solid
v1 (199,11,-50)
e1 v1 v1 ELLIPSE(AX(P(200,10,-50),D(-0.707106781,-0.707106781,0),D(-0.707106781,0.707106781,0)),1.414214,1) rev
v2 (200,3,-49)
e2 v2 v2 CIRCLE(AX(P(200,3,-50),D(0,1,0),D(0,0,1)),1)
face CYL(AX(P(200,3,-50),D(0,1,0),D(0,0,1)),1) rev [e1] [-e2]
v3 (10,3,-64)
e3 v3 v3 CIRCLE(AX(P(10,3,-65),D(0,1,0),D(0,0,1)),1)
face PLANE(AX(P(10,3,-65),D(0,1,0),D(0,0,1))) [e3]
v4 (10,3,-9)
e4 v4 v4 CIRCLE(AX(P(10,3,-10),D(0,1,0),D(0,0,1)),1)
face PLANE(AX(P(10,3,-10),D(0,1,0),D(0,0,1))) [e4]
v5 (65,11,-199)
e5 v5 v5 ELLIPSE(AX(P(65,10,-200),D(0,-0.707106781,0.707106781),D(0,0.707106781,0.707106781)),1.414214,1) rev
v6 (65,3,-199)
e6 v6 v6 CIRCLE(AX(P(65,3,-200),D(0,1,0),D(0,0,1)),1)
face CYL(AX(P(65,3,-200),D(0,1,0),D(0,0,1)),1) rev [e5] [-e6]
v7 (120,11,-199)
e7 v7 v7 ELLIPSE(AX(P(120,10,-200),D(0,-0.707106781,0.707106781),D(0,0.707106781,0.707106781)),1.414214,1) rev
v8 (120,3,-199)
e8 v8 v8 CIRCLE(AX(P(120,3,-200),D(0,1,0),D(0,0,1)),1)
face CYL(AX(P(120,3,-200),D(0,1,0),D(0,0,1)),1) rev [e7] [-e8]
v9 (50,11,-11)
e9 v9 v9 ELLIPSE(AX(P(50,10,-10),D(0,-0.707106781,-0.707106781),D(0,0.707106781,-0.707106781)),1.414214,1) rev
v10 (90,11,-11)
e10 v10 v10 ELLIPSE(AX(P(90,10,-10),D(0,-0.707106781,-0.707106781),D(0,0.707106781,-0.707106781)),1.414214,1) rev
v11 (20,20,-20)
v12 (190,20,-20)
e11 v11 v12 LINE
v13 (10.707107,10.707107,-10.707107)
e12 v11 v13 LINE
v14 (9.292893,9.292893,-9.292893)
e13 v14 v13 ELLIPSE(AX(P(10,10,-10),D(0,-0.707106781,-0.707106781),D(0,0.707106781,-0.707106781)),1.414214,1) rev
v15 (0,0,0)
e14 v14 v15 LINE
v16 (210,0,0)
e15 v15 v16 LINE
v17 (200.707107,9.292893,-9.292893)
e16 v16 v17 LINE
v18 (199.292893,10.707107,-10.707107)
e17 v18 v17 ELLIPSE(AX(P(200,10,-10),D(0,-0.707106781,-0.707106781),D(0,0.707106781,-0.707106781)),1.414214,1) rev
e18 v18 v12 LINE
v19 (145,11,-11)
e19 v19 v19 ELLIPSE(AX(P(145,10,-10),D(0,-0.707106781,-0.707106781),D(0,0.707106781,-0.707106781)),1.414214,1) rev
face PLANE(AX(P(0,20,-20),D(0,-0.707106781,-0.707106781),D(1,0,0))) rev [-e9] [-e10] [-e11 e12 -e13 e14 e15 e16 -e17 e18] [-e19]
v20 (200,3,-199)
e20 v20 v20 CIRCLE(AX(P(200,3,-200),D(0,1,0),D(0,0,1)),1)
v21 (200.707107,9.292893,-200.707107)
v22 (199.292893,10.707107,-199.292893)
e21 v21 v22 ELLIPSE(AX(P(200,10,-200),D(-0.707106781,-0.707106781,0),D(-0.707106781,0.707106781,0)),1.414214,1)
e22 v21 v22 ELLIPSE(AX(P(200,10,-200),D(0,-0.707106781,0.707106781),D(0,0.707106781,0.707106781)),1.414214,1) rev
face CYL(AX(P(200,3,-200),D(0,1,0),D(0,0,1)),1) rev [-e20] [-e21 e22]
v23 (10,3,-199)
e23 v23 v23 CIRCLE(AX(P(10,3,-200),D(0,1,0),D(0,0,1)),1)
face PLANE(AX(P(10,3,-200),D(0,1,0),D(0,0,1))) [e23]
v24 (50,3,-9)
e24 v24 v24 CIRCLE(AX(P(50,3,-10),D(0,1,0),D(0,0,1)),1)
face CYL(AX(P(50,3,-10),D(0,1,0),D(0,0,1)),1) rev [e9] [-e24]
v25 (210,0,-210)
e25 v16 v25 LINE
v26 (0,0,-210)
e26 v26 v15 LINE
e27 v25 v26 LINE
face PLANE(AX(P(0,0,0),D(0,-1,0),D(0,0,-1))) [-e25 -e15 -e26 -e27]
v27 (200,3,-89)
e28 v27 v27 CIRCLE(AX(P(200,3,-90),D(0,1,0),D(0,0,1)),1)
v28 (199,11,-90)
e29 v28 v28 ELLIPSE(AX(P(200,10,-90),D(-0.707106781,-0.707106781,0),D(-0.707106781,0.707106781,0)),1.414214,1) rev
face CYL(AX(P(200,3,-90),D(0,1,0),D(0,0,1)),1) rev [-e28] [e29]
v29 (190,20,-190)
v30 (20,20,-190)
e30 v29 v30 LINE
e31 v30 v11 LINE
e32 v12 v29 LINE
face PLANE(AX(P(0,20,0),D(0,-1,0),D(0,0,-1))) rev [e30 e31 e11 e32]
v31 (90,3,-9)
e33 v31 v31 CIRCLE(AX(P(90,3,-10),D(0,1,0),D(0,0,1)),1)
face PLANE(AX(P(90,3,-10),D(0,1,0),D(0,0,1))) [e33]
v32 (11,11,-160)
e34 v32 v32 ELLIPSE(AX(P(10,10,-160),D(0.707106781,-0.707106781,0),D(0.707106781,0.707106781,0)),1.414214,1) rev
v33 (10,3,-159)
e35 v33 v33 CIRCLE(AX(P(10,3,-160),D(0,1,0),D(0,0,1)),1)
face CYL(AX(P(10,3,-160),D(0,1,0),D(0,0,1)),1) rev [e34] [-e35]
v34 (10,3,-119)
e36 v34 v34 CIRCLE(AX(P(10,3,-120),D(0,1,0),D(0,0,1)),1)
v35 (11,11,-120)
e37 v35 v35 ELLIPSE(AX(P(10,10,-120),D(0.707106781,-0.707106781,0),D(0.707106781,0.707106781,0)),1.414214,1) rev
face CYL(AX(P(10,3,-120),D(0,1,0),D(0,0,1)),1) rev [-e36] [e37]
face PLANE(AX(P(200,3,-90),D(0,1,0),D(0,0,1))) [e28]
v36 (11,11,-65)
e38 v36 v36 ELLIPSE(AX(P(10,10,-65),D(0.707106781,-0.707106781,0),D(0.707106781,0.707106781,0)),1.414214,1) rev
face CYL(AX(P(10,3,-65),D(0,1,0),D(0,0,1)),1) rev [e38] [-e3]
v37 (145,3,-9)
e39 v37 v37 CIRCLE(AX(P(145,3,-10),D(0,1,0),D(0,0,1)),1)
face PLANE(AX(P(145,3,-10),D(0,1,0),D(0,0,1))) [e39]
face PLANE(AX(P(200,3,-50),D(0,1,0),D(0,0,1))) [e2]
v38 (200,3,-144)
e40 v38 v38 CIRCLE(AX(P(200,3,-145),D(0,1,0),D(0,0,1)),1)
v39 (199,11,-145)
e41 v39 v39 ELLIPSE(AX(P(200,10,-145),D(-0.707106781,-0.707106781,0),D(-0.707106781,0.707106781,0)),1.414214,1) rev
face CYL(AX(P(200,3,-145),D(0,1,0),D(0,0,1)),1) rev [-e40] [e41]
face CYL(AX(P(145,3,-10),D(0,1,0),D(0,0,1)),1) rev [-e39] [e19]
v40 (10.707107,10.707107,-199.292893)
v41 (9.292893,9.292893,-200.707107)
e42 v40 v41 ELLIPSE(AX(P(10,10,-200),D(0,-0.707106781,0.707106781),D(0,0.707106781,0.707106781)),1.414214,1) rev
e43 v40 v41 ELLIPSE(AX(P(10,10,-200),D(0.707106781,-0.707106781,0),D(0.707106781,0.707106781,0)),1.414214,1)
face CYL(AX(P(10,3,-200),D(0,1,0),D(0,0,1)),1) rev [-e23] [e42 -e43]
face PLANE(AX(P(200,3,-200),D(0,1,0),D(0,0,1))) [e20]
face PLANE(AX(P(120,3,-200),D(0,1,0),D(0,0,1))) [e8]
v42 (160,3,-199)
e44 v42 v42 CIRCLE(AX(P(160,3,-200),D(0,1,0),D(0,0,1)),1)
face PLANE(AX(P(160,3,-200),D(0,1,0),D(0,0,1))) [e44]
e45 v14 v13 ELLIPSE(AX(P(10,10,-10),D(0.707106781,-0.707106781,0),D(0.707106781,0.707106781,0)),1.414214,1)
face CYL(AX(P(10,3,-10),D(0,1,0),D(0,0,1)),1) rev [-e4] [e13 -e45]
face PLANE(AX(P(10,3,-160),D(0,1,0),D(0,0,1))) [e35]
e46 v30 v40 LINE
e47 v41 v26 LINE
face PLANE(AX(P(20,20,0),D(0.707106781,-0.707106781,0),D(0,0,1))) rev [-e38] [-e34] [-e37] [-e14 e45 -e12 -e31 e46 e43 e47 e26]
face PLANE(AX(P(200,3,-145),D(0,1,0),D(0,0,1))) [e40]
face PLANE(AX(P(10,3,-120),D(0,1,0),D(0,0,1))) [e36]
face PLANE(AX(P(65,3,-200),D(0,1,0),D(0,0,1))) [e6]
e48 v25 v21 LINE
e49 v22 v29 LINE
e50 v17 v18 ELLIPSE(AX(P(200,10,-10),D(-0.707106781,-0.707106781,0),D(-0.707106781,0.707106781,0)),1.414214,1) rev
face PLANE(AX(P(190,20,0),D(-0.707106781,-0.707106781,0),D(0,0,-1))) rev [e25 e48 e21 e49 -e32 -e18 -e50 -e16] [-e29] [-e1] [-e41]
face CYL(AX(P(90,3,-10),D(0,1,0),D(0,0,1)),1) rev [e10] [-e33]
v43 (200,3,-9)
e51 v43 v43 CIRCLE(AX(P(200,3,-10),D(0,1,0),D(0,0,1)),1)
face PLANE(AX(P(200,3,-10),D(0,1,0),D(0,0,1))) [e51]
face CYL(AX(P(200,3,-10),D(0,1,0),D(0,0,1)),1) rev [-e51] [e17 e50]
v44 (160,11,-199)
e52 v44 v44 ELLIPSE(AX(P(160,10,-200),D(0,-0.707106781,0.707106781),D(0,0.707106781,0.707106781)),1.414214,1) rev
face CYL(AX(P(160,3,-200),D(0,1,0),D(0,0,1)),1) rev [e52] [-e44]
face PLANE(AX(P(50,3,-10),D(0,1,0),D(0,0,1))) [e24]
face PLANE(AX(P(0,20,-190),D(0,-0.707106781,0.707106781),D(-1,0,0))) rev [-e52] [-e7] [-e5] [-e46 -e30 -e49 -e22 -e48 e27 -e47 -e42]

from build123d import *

# Parameters (mm, degrees)
CENTERSKETCH1_W            = 210
CENTERSKETCH1_H            = 210
CENTERBOSS_EXTRUDE1_DEPTH  = 20
TABHOLESSKETCH1_R          = 1
TABHOLESCUT_EXTRUDE1_DEPTH = 17
CHAMFER1_SIZE              = 20


with BuildPart() as part:
    # CenterSketch1 → CenterBoss-Extrude1 (new body)
    with BuildSketch(Plane(origin=(0, 0, 0), x_dir=(1, 0, 0), z_dir=(0, 1, 0))):
        with Locations((105, 105)):
            Rectangle(CENTERSKETCH1_W, CENTERSKETCH1_H)
    extrude(amount=CENTERBOSS_EXTRUDE1_DEPTH)

    # TabHolesSketch1 → TabHolesCut-Extrude1 (cut)
    with BuildSketch(Plane(origin=(0, 20, 0), x_dir=(1, 0, 0), z_dir=(0, 1, 0))):
        with Locations(Location((10, 10, 0), (0, 0, 270))):
            Circle(TABHOLESSKETCH1_R)
        with Locations(Location((200, 10, 0), (0, 0, 270))):
            Circle(TABHOLESSKETCH1_R)
        with Locations(Location((200, 200, 0), (0, 0, 270))):
            Circle(TABHOLESSKETCH1_R)
        with Locations(Location((10, 200, 0), (0, 0, 270))):
            Circle(TABHOLESSKETCH1_R)
        with Locations(Location((65, 200, 0), (0, 0, 270))):
            Circle(TABHOLESSKETCH1_R)
        with Locations(Location((120, 200, 0), (0, 0, 270))):
            Circle(TABHOLESSKETCH1_R)
        with Locations(Location((160, 200, 0), (0, 0, 270))):
            Circle(TABHOLESSKETCH1_R)
        with Locations(Location((10, 160, 0), (0, 0, 270))):
            Circle(TABHOLESSKETCH1_R)
        with Locations(Location((10, 65, 0), (0, 0, 270))):
            Circle(TABHOLESSKETCH1_R)
        with Locations(Location((10, 120, 0), (0, 0, 270))):
            Circle(TABHOLESSKETCH1_R)
        with Locations(Location((50, 10, 0), (0, 0, 270))):
            Circle(TABHOLESSKETCH1_R)
        with Locations(Location((90, 10, 0), (0, 0, 270))):
            Circle(TABHOLESSKETCH1_R)
        with Locations(Location((145, 10, 0), (0, 0, 270))):
            Circle(TABHOLESSKETCH1_R)
        with Locations(Location((200, 145, 0), (0, 0, 270))):
            Circle(TABHOLESSKETCH1_R)
        with Locations(Location((200, 90, 0), (0, 0, 270))):
            Circle(TABHOLESSKETCH1_R)
        with Locations(Location((200, 50, 0), (0, 0, 270))):
            Circle(TABHOLESSKETCH1_R)
    extrude(amount=-TABHOLESCUT_EXTRUDE1_DEPTH, mode=Mode.SUBTRACT)

    # Chamfer1
    # the kernel refuses this chamfer: 20 mm, written as the material it takes off along each edge
    with BuildSketch(Plane(origin=(-51.433659759, 20, 0), x_dir=(0, -0.9996219169112968, 0.027495876610586372), z_dir=(1, 0, 0)), Plane(origin=(210, 20, 51.433659759), x_dir=(0.027495876610586317, -0.9996219169112968, 0), z_dir=(0, 0, -1)), Plane(origin=(0, 20, -261.433659759), x_dir=(-0.027495876610586372, -0.9996219169112968, 0), z_dir=(0, 0, 1))) as chamfer1_piece_1:
        Polygon((CHAMFER1_SIZE * 0.999621916911, CHAMFER1_SIZE * 0.0274958766106), (-CHAMFER1_SIZE * 0.0274958766106, CHAMFER1_SIZE * 0.999621916911), (0, 0), align=None)
    extrude(amount=312.867319519, mode=Mode.SUBTRACT)
    with BuildSketch(Plane(origin=(261.433659759, 20, -210), x_dir=(0, 0.027495876610586317, 0.9996219169112968), z_dir=(-1, 0, 0))) as chamfer1_piece_2:
        Polygon((CHAMFER1_SIZE * 0.999621916911, -CHAMFER1_SIZE * 0.0274958766106), (-CHAMFER1_SIZE * 0.0274958766106, -CHAMFER1_SIZE * 0.999621916911), (0, 0), align=None)
    extrude(amount=312.867319519, mode=Mode.SUBTRACT)


solid = part.part
